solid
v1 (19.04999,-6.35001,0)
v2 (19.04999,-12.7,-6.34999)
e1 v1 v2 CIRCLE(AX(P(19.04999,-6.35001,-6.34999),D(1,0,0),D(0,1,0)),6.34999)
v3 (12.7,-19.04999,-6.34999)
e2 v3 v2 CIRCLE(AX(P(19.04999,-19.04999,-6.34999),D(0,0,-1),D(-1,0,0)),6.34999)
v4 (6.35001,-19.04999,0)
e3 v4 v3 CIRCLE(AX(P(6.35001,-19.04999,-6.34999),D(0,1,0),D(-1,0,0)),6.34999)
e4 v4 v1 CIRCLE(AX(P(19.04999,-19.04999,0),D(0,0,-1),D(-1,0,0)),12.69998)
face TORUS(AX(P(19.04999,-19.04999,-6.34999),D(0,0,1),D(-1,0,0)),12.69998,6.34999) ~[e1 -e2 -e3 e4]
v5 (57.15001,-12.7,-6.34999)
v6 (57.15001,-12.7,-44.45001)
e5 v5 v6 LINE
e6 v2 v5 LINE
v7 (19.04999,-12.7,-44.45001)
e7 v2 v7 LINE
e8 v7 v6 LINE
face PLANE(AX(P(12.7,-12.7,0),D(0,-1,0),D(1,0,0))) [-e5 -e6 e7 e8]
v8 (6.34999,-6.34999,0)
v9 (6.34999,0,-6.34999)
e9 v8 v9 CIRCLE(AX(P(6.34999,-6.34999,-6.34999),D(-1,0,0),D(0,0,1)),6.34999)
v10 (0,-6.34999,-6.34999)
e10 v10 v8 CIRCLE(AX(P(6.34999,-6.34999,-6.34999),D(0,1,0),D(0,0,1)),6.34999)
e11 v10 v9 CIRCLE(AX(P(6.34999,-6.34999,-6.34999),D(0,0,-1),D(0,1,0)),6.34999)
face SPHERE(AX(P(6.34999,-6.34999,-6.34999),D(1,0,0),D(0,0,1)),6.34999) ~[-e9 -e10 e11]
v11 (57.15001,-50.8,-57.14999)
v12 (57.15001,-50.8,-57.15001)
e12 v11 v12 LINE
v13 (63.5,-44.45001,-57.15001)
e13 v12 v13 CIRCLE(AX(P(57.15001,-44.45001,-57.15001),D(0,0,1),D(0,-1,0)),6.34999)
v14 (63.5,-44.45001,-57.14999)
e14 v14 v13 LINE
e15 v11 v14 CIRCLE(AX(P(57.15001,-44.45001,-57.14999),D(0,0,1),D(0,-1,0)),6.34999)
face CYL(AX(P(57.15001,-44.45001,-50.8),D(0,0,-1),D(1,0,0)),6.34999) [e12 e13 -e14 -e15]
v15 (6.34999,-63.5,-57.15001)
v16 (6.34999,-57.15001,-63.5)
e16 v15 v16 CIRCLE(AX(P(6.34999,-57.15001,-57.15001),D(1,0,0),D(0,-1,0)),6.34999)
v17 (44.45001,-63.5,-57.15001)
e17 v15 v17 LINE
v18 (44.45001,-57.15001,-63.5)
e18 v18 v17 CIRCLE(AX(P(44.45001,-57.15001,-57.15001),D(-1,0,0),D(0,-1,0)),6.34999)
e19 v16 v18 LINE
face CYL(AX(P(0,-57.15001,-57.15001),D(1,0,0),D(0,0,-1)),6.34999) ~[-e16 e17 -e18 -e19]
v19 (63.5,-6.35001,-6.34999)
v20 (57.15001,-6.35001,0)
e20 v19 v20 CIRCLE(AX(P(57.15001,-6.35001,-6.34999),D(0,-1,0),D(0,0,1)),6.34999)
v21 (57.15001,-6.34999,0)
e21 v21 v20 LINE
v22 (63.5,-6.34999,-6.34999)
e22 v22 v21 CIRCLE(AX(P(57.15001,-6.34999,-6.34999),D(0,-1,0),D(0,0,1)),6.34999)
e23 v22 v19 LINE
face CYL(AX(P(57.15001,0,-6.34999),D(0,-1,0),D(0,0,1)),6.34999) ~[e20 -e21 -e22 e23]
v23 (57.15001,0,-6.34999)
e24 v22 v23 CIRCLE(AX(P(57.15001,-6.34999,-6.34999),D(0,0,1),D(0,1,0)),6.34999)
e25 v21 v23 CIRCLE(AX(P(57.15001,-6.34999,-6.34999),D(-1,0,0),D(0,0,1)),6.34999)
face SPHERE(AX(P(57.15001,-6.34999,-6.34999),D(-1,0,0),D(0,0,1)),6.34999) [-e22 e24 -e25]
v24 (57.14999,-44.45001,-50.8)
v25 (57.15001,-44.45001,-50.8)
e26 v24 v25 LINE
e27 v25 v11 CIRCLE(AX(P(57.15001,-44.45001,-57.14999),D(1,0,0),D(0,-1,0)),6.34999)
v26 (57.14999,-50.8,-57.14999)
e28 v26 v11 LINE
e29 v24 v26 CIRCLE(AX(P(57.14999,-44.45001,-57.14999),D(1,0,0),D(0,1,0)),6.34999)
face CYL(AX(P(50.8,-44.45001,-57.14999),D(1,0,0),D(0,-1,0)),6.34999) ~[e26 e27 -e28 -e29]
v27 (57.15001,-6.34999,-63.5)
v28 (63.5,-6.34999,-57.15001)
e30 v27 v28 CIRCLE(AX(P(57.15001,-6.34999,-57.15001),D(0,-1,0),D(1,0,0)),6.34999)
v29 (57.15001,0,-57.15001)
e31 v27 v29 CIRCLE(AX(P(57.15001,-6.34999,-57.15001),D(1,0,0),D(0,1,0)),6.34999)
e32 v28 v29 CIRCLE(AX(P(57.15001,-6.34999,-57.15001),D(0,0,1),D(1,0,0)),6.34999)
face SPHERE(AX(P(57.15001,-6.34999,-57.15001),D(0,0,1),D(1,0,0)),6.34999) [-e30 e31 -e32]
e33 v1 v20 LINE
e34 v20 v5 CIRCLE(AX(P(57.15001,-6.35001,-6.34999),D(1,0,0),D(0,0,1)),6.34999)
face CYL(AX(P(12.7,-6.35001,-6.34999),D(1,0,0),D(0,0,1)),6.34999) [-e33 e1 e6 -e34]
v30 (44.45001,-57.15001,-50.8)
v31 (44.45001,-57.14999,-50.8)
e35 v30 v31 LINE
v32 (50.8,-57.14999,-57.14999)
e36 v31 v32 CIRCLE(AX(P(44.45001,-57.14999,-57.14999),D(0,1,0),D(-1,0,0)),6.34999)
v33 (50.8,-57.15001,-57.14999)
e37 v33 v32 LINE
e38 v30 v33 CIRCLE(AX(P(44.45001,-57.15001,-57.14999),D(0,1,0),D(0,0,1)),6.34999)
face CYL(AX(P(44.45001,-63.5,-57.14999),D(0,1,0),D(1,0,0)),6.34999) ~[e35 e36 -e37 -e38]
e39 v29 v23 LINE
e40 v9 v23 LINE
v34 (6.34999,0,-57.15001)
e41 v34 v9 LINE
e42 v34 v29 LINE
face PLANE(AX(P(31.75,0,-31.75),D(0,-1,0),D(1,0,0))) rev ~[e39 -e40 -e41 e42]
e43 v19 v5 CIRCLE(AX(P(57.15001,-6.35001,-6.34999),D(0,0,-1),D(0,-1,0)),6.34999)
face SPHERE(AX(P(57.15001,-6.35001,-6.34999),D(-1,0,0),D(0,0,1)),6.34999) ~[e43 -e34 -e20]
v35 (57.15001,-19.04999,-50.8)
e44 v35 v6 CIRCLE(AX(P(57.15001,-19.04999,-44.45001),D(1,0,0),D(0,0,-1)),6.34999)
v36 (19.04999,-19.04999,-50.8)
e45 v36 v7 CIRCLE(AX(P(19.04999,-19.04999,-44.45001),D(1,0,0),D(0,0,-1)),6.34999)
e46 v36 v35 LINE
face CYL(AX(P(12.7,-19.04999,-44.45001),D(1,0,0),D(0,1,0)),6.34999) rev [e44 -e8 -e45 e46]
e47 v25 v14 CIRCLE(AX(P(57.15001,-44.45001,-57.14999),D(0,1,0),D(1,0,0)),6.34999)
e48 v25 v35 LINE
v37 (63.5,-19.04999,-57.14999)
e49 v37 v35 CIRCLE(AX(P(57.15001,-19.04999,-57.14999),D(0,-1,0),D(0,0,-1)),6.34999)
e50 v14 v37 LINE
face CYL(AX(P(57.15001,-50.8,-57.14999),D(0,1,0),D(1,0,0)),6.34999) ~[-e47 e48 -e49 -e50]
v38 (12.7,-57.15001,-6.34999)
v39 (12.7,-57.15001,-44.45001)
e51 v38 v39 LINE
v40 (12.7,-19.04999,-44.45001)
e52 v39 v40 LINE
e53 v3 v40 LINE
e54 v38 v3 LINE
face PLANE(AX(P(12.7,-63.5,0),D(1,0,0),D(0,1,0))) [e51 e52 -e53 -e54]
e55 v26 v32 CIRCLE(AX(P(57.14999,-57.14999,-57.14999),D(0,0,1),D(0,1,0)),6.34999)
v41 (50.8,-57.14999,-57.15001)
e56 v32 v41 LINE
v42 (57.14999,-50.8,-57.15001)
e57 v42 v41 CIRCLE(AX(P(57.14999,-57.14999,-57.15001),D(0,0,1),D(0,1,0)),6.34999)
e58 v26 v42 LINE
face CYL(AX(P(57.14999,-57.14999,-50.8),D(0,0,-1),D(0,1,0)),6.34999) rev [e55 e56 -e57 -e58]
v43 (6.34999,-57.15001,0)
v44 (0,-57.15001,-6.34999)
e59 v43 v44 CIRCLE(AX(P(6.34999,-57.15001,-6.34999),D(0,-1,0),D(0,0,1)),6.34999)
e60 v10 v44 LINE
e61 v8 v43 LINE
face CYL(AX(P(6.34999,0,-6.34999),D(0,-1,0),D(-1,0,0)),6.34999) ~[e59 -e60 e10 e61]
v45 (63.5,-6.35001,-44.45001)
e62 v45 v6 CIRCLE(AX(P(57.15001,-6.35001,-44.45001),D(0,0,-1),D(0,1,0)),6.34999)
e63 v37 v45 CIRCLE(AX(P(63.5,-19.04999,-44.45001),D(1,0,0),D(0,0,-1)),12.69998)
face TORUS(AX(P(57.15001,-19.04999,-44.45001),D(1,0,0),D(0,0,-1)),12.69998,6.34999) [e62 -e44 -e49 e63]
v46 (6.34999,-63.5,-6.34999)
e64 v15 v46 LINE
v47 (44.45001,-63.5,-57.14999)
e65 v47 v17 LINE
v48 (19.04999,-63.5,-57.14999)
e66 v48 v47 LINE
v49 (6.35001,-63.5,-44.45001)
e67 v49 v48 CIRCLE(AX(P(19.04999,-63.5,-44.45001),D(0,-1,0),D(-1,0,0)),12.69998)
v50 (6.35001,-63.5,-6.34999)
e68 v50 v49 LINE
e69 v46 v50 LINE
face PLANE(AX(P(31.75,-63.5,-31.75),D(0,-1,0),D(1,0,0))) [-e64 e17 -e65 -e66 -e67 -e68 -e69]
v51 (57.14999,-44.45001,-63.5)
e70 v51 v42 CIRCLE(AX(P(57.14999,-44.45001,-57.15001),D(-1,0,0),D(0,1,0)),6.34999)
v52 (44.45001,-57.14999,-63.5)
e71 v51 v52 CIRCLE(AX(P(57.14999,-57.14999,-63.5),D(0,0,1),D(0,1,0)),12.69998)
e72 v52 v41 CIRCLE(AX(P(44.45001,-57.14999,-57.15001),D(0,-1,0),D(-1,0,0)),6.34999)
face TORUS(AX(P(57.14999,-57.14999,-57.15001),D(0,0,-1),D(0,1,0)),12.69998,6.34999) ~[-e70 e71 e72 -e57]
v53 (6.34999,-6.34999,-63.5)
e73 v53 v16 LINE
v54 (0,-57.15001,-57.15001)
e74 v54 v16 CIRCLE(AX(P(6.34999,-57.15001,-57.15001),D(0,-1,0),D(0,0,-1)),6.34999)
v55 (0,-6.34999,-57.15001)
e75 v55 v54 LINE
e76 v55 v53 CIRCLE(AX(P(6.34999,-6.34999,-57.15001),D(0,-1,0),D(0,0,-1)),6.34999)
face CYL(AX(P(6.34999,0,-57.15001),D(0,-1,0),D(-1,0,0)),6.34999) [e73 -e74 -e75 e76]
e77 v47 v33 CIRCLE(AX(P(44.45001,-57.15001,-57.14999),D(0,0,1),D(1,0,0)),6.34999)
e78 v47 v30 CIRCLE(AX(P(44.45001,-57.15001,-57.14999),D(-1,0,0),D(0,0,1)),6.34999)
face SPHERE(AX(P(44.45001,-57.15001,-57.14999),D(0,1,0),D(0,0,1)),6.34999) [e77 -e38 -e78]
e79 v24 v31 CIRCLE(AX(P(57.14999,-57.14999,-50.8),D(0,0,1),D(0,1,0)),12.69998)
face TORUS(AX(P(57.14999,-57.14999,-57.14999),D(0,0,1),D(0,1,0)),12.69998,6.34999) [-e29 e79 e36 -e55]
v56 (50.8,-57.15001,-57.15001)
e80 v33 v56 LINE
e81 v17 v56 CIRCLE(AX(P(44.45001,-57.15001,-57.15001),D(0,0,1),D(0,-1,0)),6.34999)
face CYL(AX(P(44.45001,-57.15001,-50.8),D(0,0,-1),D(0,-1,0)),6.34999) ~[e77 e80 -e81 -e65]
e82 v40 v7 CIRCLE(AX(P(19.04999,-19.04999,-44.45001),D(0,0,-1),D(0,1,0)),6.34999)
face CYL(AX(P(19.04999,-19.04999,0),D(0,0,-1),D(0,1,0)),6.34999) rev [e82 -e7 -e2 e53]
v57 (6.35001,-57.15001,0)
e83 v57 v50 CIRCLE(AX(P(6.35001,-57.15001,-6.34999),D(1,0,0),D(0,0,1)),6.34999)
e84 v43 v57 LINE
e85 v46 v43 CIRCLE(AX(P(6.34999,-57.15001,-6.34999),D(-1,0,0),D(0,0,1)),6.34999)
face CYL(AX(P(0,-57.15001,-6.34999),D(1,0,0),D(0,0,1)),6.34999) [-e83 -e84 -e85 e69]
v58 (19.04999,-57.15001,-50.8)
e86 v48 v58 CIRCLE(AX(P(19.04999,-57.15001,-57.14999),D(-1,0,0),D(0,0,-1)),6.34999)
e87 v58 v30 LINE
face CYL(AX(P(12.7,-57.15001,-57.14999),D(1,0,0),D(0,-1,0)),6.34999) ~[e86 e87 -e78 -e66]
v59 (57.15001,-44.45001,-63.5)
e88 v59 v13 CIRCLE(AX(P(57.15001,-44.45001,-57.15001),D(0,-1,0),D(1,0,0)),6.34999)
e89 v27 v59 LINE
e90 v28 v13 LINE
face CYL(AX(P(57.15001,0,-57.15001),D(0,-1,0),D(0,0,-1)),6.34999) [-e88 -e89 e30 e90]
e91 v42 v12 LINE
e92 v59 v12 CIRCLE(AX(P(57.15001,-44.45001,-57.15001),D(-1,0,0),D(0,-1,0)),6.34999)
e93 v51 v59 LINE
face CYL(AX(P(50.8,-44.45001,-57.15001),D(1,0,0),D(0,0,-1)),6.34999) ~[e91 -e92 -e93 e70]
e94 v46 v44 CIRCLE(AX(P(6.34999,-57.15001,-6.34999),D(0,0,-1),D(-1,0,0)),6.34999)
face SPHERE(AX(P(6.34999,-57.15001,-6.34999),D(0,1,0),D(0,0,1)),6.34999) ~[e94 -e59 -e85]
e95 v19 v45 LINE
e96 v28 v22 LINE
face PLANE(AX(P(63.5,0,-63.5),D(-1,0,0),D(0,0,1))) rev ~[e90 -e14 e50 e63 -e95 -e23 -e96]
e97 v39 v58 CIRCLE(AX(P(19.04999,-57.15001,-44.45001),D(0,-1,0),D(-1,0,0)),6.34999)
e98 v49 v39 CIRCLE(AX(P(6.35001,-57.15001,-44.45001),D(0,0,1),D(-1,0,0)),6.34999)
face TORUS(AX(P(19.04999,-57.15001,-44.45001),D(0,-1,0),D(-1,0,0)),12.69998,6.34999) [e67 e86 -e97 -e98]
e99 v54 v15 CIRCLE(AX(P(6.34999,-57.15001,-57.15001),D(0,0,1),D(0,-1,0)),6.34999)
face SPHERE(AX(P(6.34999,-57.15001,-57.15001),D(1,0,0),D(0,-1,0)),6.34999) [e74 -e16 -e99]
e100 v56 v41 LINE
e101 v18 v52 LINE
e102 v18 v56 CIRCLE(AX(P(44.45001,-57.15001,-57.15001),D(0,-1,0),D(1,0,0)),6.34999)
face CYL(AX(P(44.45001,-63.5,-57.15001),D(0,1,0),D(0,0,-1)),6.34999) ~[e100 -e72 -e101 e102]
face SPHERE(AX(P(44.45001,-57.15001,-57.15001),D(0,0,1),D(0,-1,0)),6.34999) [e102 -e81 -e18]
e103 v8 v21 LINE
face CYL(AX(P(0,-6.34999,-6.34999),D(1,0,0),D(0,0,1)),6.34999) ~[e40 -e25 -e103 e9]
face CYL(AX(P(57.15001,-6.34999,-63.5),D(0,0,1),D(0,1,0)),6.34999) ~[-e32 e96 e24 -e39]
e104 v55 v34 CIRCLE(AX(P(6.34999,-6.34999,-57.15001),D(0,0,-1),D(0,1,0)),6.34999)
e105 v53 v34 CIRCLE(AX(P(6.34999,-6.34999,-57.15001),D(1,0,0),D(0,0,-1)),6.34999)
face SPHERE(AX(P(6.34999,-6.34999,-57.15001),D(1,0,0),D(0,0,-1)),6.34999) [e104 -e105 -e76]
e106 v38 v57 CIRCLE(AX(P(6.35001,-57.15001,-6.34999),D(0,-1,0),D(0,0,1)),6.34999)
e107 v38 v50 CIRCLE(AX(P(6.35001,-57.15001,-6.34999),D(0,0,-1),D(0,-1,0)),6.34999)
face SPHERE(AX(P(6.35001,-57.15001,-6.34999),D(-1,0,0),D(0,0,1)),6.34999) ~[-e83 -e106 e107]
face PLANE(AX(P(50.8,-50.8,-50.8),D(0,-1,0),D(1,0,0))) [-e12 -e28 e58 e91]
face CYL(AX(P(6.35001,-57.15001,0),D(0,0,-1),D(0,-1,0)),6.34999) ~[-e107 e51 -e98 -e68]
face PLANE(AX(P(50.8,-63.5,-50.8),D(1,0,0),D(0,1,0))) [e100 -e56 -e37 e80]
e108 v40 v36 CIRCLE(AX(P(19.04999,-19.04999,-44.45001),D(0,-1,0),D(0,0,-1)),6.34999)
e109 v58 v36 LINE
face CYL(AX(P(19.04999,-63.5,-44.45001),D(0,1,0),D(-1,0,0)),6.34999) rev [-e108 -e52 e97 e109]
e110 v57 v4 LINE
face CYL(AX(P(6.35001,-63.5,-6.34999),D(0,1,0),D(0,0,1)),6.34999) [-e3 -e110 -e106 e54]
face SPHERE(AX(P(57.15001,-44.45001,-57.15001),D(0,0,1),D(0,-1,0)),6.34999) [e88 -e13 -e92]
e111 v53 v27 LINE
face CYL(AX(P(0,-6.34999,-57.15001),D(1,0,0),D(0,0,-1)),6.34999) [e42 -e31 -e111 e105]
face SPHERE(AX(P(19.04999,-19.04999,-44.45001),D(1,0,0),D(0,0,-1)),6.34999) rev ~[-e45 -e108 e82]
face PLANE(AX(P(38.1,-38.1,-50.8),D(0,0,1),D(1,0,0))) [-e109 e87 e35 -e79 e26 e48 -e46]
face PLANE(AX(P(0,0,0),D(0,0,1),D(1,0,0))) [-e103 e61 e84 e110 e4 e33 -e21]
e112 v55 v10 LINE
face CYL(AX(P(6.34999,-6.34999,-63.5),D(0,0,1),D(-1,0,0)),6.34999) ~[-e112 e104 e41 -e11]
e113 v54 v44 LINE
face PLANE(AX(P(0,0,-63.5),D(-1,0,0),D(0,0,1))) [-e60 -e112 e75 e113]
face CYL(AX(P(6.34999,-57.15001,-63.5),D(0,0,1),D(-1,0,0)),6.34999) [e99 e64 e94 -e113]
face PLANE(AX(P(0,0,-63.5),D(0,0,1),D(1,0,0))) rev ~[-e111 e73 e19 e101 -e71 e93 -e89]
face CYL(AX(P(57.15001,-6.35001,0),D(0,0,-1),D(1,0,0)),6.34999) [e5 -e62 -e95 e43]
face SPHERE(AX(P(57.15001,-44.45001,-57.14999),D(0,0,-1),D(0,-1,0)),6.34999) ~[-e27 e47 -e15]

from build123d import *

# Parameters (mm, degrees)
F0_W     = 63.5
F0_H     = 63.5
F1_DEPTH = 63.5
F2_W     = 50.8
F2_H     = 50.8
F3_DEPTH = 50.8
F4_W     = 12.7
F4_H     = 12.7
F5_DEPTH = 12.7
F6_R     = 6.34999


# Not quite as in the source:
# - a fillet or chamfer is up to 0.001 mm smaller than in the source, because OpenCascade refuses the exact size


with BuildPart() as f1:
    # F0 (on Front) → F1 (new body)
    with BuildSketch(Plane.XZ):
        with Locations((31.75, -31.75)):
            Rectangle(F0_W, F0_H)
    extrude(amount=F1_DEPTH)

    # F2 (on face) → F3 (cut)
    with BuildSketch(Plane.XY):
        with Locations((38.1, -38.1)):
            Rectangle(F2_W, F2_H)
    extrude(amount=-F3_DEPTH, mode=Mode.SUBTRACT)

    # F4 (on face) → F5 (cut)
    with BuildSketch(Plane.XY.offset(-50.8)):
        with Locations((57.15, -57.15)):
            Rectangle(F4_W, F4_H)
    extrude(amount=-F5_DEPTH, mode=Mode.SUBTRACT)

    # F6 (radius 6.35 in the source; OpenCascade refuses exactly that, so slightly less here)
    f6_edges = [f1.edges().sort_by_distance(p)[0] for p in [
        (31.75, 0, 0),
        (0, -31.75, 0),
        (6.35, -63.5, 0),
        (12.7, -38.1, 0),
        (38.1, -12.7, 0),
        (63.5, -6.35, 0),
        (63.5, -50.8, -57.15),
        (50.8, -50.8, -57.15),
        (57.15, -50.8, -50.8),
        (57.15, -50.8, -63.5),
        (38.1, -12.7, -50.8),
        (63.5, -31.75, -50.8),
        (50.8, -57.15, -50.8),
        (31.75, -63.5, -50.8),
        (12.7, -38.1, -50.8),
        (63.5, 0, -31.75),
        (63.5, -12.7, -25.4),
        (63.5, -25.4, -63.5),
        (12.7, -63.5, -25.4),
        (50.8, -63.5, -57.15),
        (25.4, -63.5, -63.5),
        (0, -63.5, -31.75),
        (50.8, -57.15, -63.5),
        (31.75, 0, -63.5),
        (0, -31.75, -63.5),
        (12.7, -12.7, -25.4),
        (0, 0, -31.75),
    ]]
    fillet(f6_edges, radius=F6_R)


solid = f1.part
